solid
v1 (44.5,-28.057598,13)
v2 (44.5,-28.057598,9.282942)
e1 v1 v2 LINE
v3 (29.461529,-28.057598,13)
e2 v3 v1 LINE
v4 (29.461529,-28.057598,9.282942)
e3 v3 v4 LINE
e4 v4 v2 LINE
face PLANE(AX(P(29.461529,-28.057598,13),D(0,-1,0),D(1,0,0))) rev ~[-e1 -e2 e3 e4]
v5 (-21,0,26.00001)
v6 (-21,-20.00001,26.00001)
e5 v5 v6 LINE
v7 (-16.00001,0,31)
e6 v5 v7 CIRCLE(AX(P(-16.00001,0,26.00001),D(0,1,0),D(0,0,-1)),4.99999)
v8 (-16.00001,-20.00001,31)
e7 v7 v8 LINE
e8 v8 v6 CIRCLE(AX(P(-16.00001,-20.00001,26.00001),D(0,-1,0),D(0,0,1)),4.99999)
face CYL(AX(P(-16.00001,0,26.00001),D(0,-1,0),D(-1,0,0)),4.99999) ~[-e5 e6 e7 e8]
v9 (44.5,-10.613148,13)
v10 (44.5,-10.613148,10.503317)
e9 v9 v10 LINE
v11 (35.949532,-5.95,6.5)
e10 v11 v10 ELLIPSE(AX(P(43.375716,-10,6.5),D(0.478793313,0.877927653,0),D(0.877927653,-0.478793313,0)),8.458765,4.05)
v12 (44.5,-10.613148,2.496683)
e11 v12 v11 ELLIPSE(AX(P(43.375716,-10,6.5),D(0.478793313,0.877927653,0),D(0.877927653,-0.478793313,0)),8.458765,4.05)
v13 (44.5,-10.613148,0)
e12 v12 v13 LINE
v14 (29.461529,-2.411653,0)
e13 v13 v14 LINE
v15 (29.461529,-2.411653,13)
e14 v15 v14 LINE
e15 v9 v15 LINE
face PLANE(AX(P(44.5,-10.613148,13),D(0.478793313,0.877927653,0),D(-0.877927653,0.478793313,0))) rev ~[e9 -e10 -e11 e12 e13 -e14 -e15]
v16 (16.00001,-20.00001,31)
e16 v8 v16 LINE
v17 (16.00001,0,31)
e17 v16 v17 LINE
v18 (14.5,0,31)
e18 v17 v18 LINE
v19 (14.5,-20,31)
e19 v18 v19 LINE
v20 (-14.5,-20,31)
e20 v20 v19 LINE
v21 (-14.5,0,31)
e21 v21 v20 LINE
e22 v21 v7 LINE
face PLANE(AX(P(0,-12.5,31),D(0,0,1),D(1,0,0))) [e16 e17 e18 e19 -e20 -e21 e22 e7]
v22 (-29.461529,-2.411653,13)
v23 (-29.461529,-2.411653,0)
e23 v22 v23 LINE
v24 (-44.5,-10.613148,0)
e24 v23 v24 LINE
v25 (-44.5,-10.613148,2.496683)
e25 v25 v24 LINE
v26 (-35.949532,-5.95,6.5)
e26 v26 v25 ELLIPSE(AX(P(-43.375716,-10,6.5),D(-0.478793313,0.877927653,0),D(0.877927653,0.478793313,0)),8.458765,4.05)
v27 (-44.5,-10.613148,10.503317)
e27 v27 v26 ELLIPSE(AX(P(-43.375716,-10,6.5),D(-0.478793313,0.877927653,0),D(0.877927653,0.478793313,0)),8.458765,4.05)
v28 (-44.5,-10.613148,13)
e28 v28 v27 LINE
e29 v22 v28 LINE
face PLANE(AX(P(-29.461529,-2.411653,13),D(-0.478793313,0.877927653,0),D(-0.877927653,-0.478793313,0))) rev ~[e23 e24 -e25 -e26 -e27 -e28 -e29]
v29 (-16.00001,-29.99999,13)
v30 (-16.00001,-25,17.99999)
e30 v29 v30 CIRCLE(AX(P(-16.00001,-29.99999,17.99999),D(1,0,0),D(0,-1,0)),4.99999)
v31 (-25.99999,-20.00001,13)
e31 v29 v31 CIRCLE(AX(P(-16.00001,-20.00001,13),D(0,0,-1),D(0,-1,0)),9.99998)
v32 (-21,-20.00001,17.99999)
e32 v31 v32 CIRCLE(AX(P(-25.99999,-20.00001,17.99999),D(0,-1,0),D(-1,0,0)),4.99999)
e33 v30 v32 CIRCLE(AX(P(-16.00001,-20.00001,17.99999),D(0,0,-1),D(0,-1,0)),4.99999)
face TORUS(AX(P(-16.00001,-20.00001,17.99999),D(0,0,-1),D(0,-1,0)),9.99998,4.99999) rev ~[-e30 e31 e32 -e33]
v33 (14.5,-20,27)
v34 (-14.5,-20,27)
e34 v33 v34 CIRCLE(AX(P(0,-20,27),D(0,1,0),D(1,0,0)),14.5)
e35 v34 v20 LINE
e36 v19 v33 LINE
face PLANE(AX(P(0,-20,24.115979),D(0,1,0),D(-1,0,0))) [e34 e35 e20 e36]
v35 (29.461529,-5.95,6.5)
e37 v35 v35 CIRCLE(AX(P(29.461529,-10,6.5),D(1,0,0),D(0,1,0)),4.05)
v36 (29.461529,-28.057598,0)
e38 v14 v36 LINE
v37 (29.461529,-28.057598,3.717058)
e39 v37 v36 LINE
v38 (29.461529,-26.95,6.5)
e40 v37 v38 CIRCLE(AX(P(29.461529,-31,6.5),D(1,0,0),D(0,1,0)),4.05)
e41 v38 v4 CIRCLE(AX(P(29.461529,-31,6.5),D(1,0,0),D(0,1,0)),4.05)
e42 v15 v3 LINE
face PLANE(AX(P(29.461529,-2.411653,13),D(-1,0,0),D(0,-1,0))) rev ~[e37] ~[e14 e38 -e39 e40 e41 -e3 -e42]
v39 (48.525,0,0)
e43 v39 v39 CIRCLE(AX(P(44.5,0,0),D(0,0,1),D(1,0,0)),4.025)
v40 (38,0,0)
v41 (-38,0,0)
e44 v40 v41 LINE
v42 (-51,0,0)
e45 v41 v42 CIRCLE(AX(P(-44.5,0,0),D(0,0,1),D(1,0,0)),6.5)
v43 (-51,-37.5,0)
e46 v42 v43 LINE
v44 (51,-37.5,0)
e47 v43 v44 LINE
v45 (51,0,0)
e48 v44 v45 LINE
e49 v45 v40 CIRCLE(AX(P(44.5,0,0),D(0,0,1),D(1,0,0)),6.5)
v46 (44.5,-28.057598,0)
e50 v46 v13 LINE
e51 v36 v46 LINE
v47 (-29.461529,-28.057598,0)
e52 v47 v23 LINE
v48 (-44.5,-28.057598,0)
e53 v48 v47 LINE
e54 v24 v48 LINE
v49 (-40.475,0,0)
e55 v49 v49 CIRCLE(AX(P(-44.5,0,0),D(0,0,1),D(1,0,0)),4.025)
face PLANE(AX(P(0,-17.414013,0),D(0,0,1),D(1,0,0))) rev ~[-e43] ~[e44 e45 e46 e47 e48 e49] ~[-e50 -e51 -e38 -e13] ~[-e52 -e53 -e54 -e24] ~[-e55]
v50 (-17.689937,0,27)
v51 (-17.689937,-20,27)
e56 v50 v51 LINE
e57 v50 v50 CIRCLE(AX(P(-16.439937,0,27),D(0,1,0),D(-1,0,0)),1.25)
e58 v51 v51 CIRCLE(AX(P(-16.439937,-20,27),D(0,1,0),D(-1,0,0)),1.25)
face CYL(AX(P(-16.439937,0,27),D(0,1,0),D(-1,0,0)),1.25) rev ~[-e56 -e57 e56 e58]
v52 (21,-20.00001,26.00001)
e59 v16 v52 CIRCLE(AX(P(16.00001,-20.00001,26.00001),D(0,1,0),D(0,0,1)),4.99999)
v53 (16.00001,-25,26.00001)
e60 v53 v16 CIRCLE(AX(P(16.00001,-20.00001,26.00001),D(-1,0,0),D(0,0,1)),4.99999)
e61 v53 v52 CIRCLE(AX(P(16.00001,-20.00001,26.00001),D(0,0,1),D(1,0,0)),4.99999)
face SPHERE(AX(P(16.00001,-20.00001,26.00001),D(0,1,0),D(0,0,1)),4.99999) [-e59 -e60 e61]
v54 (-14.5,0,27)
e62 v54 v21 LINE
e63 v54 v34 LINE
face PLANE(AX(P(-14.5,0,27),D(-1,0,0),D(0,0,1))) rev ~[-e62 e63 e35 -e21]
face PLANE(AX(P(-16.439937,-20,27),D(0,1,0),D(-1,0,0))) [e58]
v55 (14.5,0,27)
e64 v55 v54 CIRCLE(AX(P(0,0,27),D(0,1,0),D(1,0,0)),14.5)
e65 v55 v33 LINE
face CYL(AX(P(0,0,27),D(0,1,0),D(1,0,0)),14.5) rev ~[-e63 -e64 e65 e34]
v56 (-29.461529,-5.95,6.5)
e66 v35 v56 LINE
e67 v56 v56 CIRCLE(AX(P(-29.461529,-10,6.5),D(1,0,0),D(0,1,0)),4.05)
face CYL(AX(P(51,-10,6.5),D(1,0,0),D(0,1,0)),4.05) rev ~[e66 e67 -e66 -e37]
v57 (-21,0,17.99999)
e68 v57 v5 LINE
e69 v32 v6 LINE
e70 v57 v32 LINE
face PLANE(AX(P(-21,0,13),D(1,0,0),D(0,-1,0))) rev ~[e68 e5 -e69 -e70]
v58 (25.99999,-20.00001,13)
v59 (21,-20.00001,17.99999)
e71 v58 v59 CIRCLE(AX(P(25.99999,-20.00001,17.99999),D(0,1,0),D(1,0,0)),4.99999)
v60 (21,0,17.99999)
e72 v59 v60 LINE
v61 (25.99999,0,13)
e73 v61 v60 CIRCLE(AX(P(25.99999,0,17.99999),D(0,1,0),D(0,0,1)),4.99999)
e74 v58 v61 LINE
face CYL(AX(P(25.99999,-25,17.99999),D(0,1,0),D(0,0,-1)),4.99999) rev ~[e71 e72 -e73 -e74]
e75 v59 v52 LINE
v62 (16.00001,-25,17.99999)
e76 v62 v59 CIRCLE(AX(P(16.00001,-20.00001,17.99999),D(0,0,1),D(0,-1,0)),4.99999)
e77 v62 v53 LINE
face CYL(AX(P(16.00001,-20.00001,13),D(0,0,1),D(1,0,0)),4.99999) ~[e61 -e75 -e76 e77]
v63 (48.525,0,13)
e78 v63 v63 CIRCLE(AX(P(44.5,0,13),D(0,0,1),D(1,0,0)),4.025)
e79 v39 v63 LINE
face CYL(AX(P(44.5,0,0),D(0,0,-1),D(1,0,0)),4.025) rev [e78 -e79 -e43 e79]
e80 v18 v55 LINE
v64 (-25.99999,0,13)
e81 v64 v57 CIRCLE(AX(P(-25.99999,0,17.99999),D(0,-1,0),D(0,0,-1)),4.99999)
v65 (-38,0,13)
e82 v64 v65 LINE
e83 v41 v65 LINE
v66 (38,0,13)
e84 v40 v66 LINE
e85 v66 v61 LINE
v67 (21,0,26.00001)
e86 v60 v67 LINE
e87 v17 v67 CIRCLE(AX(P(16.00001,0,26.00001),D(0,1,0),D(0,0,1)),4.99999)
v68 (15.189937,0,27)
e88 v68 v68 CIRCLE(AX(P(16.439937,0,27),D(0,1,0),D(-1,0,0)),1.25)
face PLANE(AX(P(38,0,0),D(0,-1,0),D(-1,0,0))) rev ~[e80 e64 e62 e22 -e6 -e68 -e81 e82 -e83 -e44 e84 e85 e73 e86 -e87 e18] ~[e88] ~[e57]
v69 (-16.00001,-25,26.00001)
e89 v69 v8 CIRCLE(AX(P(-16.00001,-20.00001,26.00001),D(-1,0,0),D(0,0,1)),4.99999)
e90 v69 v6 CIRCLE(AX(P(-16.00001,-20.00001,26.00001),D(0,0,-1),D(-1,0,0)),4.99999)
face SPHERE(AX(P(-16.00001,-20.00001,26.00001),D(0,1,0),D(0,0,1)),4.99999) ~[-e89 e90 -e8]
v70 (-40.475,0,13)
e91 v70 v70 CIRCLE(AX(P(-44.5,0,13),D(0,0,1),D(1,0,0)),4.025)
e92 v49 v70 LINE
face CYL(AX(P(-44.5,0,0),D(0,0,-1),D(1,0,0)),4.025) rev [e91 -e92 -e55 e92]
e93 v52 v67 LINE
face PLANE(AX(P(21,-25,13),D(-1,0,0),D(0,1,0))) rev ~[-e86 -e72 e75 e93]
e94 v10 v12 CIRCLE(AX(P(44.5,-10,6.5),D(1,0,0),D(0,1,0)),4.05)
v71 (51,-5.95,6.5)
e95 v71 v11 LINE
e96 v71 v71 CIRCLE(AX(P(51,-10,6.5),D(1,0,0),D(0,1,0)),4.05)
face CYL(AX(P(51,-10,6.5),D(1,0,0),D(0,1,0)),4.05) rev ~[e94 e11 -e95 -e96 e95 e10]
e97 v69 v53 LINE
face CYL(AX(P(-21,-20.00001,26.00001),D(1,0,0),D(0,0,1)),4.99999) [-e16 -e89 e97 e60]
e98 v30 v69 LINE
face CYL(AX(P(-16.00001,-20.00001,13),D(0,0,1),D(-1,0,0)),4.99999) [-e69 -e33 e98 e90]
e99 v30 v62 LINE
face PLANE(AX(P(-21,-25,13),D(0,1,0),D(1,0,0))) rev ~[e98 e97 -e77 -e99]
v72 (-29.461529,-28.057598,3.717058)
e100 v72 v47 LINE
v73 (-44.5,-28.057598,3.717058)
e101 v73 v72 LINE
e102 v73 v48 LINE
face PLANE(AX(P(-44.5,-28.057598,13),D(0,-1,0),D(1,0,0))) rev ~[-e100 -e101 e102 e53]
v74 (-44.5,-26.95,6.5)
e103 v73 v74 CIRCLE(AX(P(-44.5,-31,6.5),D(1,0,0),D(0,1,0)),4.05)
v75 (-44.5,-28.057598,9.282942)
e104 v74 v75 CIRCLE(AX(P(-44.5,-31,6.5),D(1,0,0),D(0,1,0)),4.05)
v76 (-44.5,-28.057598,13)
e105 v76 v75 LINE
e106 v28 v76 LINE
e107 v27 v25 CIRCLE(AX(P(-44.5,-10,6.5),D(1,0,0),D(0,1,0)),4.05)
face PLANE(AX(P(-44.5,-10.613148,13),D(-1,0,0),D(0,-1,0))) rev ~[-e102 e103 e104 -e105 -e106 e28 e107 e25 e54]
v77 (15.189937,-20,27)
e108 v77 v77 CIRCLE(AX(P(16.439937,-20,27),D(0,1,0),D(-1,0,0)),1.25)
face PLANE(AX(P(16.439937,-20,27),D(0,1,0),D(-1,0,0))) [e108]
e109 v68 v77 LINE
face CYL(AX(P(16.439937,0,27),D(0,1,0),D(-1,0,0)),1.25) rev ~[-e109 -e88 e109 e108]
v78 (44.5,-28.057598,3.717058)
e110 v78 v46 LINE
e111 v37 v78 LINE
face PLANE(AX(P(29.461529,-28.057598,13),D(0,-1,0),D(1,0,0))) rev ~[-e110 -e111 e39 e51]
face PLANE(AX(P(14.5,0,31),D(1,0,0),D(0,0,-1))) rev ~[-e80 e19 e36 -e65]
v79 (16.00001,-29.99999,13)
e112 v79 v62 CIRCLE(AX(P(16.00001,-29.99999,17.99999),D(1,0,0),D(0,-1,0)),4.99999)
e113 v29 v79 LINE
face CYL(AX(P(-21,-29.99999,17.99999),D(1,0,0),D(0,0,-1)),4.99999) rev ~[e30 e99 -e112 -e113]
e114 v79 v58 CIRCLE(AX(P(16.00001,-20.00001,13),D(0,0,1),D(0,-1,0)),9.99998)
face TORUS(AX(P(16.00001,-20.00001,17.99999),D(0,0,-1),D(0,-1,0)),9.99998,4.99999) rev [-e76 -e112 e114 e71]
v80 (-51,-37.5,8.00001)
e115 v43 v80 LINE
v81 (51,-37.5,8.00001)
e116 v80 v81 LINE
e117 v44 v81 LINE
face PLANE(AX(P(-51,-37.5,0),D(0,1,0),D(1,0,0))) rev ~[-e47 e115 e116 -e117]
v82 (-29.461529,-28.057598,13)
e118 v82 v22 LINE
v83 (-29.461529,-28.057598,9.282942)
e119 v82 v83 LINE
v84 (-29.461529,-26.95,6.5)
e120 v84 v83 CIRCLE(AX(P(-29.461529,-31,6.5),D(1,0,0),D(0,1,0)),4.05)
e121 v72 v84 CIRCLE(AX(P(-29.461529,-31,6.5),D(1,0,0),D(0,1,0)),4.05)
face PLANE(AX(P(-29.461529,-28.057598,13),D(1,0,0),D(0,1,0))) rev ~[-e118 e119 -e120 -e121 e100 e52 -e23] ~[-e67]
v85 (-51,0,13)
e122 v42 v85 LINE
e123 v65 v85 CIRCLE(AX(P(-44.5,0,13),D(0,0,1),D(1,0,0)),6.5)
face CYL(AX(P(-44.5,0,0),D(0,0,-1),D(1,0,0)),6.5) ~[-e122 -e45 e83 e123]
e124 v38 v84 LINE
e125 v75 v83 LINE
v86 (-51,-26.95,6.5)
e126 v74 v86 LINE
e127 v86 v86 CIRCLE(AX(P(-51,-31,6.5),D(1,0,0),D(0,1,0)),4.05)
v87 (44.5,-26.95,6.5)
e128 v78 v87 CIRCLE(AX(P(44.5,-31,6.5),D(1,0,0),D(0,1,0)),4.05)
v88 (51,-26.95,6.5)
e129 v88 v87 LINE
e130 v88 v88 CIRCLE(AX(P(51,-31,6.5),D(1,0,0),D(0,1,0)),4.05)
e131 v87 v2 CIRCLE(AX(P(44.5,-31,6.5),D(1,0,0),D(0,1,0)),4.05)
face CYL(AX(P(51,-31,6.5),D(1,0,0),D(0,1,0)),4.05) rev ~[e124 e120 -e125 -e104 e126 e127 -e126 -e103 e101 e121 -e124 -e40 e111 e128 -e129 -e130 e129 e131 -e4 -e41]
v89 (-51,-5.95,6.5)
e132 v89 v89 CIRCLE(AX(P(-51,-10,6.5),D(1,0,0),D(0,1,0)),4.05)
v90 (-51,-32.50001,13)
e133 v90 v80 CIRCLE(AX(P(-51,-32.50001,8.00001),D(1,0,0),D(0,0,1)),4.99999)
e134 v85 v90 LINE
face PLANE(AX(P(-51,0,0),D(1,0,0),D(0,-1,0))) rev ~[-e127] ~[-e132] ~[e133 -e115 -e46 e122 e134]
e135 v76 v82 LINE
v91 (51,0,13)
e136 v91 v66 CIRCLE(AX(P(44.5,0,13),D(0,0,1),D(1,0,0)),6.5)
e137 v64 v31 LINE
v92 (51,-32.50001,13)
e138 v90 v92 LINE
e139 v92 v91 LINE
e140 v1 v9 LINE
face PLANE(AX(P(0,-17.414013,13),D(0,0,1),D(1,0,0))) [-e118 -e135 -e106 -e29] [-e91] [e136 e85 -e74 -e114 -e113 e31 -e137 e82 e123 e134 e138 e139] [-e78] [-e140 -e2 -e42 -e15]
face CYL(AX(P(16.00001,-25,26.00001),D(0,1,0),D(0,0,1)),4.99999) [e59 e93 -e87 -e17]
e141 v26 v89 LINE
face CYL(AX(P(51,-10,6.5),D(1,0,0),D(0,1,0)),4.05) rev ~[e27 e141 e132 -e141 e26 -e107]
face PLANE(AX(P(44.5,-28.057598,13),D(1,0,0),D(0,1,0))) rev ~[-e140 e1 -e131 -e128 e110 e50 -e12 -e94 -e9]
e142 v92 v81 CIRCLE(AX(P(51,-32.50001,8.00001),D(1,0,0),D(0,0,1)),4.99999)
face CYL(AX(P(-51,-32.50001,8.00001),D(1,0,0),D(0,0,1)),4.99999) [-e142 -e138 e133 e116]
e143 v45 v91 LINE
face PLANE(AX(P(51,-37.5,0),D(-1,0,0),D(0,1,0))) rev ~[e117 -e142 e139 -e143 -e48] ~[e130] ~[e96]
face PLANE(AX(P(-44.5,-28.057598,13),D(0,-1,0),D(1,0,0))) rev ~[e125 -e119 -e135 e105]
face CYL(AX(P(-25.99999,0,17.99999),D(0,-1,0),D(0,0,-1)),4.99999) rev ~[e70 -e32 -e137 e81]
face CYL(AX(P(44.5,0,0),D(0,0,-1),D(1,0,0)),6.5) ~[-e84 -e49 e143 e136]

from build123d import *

# Parameters (mm, degrees)
F0_R      = 4.025
F1_DEPTH  = 13
F2_R      = 4.05
F3_DEPTH  = 120
F5_DEPTH  = 18
F6_R      = 1.25
F7_DEPTH  = 20
F8_R      = 4.99999
F10_DEPTH = 25


# Not quite as in the source:
# - a fillet or chamfer is up to 0.001 mm smaller than in the source, because OpenCascade refuses the exact size


with BuildPart() as f1:
    # F0 (on Top) → F1 (new body)
    with BuildSketch(Plane.XY):
        with BuildLine():
            Line((38, 0), (0, 0))
            Line((0, 0), (-38, 0))
            ThreePointArc((-38, 0), (-44.5, 6.5), (-51, 0))
            Line((-51, 0), (-51, -37.5))
            Line((-51, -37.5), (0, -37.5))
            Line((0, -37.5), (51, -37.5))
            Line((51, -37.5), (51, 0))
            ThreePointArc((51, 0), (44.5, 6.5), (38, 0))
        make_face()
        with Locations((-44.5, 0)):
            Circle(F0_R, mode=Mode.SUBTRACT)
        with Locations((44.5, 0)):
            Circle(F0_R, mode=Mode.SUBTRACT)
    extrude(amount=F1_DEPTH)

    # F2 (on face) → F3 (cut)
    with BuildSketch(Plane.YZ.offset(51)):
        with Locations((-31, 6.5)):
            Circle(F2_R)
        with Locations((-10, 6.5)):
            Circle(F2_R)
    extrude(amount=-F3_DEPTH, mode=Mode.SUBTRACT)

    # F4 (on face) → F5 (join)
    with BuildSketch(Plane.XY.offset(13)):
        Polygon((-21, -25), (0, -25), (21, -25), (21, 0), (-21, 0), align=None)
    extrude(amount=F5_DEPTH)

    # F6 (on face) → F7 (cut)
    with BuildSketch(Plane(origin=(0, 0, 0), x_dir=(-1, 0, 0), z_dir=(0, 1, 0))):
        with BuildLine():
            Line((-14.5, 31), (-14.5, 27))
            ThreePointArc((-14.5, 27), (0, 12.5), (14.5, 27))
            Line((14.5, 27), (14.5, 31))
            Line((14.5, 31), (-14.5, 31))
        make_face()
        with Locations((-16.4399370551, 27)):
            Circle(F6_R)
        with Locations((16.4399370551, 27)):
            Circle(F6_R)
    extrude(amount=-F7_DEPTH, mode=Mode.SUBTRACT)

    # F8 (radius 5 in the source; OpenCascade refuses exactly that, so slightly less here)
    f8_edges = [f1.edges().sort_by_distance(p)[0] for p in [
        (21, -12.5, 31),
        (-21, -12.5, 31),
        (21, -12.5, 13),
        (-21, -12.5, 13),
        (0, -25, 31),
        (21, -25, 22),
        (-21, -25, 22),
        (0, -37.5, 13),
        (0, -25, 13),
    ]]
    fillet(f8_edges, radius=F8_R)

    # F9 (on face) → F10 (cut)
    with BuildSketch(Plane.XY.offset(13)):
        Polygon((44.5, -28.0575975776), (44.5, -10.6131481007), (29.4615291059, -2.4116530549), (29.4615291059, -28.0575975776), align=None)
        Polygon((-29.4615291059, -2.4116530549), (-44.5, -10.6131481007), (-44.5, -28.0575975776), (-29.4615291059, -28.0575975776), align=None)
    extrude(amount=-F10_DEPTH, mode=Mode.SUBTRACT)


solid = f1.part
